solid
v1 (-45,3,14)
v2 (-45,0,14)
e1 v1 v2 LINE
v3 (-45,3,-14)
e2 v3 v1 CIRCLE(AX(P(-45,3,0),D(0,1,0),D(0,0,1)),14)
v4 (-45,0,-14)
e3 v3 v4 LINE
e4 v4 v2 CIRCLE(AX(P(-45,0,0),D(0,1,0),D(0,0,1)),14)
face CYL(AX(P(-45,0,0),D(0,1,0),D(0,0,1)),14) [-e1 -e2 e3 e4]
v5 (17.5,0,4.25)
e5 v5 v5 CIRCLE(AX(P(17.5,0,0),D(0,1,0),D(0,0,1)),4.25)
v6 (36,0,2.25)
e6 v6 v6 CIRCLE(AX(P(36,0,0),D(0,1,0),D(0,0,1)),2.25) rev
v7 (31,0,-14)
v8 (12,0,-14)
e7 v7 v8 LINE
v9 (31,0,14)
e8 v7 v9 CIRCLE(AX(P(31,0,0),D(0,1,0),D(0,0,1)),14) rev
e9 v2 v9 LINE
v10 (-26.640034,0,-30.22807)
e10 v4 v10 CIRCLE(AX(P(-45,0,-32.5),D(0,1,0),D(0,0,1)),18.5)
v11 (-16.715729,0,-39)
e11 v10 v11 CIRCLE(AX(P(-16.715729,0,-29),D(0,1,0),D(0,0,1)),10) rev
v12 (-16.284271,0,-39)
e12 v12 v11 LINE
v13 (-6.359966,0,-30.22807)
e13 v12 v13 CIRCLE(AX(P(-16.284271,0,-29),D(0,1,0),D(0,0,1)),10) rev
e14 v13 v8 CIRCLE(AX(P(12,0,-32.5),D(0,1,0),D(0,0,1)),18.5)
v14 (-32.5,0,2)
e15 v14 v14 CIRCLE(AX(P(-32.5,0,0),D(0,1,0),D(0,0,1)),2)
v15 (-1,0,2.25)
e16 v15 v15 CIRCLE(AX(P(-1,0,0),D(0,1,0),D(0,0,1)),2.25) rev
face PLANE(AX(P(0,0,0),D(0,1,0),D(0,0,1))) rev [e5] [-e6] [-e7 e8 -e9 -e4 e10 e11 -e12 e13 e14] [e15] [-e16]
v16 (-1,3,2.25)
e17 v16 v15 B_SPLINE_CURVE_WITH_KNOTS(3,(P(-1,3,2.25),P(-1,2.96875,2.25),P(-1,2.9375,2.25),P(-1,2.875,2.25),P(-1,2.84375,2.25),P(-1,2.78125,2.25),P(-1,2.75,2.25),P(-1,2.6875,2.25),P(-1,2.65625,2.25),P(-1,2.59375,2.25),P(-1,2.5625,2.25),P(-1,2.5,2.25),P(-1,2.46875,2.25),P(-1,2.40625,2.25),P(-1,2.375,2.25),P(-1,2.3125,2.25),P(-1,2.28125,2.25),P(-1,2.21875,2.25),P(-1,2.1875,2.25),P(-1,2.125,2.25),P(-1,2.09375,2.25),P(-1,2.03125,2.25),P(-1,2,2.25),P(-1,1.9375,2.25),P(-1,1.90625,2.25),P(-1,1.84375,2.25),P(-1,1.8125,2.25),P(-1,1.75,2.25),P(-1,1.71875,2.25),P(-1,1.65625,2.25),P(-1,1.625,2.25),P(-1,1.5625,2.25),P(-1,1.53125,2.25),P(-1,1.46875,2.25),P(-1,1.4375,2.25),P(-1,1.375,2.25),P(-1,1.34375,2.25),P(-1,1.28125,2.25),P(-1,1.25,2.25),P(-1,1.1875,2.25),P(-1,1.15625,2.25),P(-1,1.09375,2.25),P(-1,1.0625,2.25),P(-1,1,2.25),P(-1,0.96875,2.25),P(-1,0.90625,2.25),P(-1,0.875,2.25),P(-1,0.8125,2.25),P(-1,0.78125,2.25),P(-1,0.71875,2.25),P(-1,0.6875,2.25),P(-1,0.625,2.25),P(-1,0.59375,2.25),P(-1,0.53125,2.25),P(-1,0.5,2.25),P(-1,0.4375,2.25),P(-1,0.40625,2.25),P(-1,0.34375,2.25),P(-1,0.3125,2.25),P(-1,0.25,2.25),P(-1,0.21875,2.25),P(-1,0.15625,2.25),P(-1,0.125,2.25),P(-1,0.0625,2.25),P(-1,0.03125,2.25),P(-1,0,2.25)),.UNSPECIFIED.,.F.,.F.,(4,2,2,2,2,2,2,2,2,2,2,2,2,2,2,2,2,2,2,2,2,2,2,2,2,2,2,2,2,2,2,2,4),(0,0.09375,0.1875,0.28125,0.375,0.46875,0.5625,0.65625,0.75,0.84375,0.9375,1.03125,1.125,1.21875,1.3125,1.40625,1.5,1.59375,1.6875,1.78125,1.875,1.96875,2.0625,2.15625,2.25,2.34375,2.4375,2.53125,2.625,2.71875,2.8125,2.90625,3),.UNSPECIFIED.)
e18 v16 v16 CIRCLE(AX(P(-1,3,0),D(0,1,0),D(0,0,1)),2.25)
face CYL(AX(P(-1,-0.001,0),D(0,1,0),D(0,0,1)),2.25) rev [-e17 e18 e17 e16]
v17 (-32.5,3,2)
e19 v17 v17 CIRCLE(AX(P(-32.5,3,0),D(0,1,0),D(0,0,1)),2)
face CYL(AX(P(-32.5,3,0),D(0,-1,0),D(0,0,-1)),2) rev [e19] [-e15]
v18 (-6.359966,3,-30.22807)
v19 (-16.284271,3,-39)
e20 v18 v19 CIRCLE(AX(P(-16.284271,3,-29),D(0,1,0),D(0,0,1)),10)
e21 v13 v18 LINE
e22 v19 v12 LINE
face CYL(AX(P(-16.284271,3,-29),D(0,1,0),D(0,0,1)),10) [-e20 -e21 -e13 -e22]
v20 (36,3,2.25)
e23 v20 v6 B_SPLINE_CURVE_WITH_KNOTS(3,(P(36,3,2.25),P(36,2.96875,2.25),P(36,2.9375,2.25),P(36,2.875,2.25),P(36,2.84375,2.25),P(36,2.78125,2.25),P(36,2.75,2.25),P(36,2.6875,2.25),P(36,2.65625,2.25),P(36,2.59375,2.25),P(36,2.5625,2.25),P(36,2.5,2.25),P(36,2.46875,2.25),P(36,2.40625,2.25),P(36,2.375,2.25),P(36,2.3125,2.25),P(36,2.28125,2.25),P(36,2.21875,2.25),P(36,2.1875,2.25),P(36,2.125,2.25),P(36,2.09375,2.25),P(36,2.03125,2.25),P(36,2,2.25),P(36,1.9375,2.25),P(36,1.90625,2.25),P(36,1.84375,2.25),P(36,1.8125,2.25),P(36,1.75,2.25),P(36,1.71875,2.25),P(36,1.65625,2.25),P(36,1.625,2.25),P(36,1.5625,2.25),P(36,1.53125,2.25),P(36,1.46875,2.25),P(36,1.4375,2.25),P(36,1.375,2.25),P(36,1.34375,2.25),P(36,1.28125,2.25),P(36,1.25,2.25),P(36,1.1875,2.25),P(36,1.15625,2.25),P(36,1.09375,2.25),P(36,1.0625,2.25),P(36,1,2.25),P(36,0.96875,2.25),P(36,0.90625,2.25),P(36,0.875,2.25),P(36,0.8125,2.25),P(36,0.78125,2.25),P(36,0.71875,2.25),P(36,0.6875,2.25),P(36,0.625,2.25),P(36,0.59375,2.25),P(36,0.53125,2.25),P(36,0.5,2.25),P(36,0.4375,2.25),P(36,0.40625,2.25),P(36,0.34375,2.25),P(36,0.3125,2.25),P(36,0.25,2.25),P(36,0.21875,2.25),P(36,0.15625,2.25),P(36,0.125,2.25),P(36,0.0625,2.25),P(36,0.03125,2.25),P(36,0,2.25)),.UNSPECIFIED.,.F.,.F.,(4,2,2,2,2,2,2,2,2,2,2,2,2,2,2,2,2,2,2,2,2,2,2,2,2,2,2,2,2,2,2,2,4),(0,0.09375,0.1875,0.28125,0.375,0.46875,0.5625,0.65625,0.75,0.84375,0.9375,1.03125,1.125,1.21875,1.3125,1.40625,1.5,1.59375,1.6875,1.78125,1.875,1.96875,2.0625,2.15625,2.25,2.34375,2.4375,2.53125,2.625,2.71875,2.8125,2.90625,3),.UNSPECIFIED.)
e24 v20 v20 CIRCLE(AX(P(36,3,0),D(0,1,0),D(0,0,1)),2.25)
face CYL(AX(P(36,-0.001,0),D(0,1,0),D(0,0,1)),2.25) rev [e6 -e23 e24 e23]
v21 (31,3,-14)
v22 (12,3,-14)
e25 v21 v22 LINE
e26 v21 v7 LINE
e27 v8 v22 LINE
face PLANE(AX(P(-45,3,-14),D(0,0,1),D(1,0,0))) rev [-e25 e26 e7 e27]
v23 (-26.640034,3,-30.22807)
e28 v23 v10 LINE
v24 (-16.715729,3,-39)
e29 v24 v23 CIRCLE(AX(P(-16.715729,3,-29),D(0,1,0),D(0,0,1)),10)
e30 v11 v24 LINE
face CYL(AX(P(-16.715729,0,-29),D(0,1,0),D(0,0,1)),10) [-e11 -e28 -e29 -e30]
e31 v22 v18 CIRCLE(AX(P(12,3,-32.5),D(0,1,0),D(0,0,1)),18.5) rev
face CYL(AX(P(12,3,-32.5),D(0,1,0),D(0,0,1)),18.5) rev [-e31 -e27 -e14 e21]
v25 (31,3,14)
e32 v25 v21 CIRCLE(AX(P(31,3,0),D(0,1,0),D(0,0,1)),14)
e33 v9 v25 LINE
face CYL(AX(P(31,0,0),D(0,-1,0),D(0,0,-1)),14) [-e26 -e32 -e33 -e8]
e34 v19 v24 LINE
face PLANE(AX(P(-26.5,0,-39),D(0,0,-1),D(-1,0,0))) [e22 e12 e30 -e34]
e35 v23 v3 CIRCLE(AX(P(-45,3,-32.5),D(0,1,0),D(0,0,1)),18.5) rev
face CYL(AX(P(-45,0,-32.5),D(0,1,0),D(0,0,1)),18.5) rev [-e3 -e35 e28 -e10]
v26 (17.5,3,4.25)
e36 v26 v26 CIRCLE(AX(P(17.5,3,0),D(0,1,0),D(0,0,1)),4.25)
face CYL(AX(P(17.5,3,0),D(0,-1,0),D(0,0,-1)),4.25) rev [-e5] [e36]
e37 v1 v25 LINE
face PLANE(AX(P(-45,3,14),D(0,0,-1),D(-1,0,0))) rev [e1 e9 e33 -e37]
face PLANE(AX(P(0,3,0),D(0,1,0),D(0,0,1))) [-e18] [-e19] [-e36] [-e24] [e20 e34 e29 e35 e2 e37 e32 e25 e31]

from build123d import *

# Parameters (mm, degrees)
SKETCH_1_W          = 90
SKETCH_1_H          = 28
SKETCH_1_R          = 4.25
SKETCH_1_R_2        = 2
EXTRUDE_1_DEPTH     = 3
CUT_EXTRUDE_1_REACH = 49.223
SKETCH_3_R          = 2.25
SKETCH_4_W          = 20
SKETCH_4_H          = 25
EXTRUDE_3_DEPTH     = 3
FILLET_6_R          = 18.5
FILLET_9_R          = 10
EXTRUDE_4_DEPTH     = 3
FILLET_11_RADIUS    = 14
FILLET_11_LENGTH    = 3


with BuildPart() as part:
    # 草图1 → 凸台-拉伸1 (new body)
    with BuildSketch(Plane(origin=(0, 0, 0), x_dir=(1, 0, 0), z_dir=(0, 1, 0))):
        Rectangle(SKETCH_1_W, SKETCH_1_H)
        with Locations(Location((17.5, 0, 0), (0, 0, 270))):
            Circle(SKETCH_1_R, mode=Mode.SUBTRACT)
        with Locations(Location((-32.5, 0, 0), (0, 0, 270))):
            Circle(SKETCH_1_R_2, mode=Mode.SUBTRACT)
    extrude(amount=EXTRUDE_1_DEPTH)

    # 草图3 → 切除-拉伸1 (cut, up to next)
    with BuildSketch(Plane(origin=(0, 3, 0), x_dir=(1, 0, 0), z_dir=(0, 1, 0)), mode=Mode.PRIVATE) as cut_extrude_1_sk1:
        with Locations(Location((36, 0, 0), (0, 0, 270))):
            Circle(SKETCH_3_R)
    cut_extrude_1_tool1 = extrude(cut_extrude_1_sk1.sketch, amount=-CUT_EXTRUDE_1_REACH, mode=Mode.PRIVATE) & part.part
    # 草图3 → 切除-拉伸1 (cut, up to next)
    with BuildSketch(Plane(origin=(0, 3, 0), x_dir=(1, 0, 0), z_dir=(0, 1, 0)), mode=Mode.PRIVATE) as cut_extrude_1_sk2:
        with Locations(Location((-1, 0, 0), (0, 0, 270))):
            Circle(SKETCH_3_R)
    cut_extrude_1_tool2 = extrude(cut_extrude_1_sk2.sketch, amount=-CUT_EXTRUDE_1_REACH, mode=Mode.PRIVATE) & part.part
    add(cut_extrude_1_tool1.solids().sort_by_distance((36, 3, 0))[0], mode=Mode.SUBTRACT)
    add(cut_extrude_1_tool2.solids().sort_by_distance((-1, 3, 0))[0], mode=Mode.SUBTRACT)

    # 草图4 → 凸台-拉伸3 (add)
    with BuildSketch(Plane(origin=(0, 3, 0), x_dir=(1, 0, 0), z_dir=(0, 1, 0))):
        with Locations((-16.5, 26.5)):
            Rectangle(SKETCH_4_W, SKETCH_4_H)
    extrude(amount=-EXTRUDE_3_DEPTH)

    # 圆角6
    fillet_6_edges = [part.edges().sort_by_distance(p)[0] for p in [
        (-26.5, 1.5, -14),
        (-6.5, 1.5, -14),
    ]]
    fillet(fillet_6_edges, radius=FILLET_6_R - 0.0001)  # a hair under: the kernel refuses the full size

    # 圆角9
    fillet_9_edges = [part.edges().sort_by_distance(p)[0] for p in [
        (-6.5, 1.5, -39),
        (-26.5, 1.5, -39),
    ]]
    fillet(fillet_9_edges, radius=FILLET_9_R)

    # 草图6 → 凸台-拉伸4 (add)
    with BuildSketch(Plane(origin=(0, 3, 0), x_dir=(1, 0, 0), z_dir=(0, 1, 0))):
        with BuildLine():
            Line((-45, -14), (-45, 14))
            ThreePointArc((-45, 14), (-59, 0), (-45, -14))
        make_face()
    extrude(amount=-EXTRUDE_4_DEPTH)

    # 圆角11: full round fillet: the end face becomes a half cylinder, R = half its width
    fillet_11_face = Plane((45, 1.5, 0), x_dir=(0, -1, 0), z_dir=(1, 0, 0))  # on the end face: x along it, z out of the body
    fillet_11_slab = fillet_11_face.offset(-FILLET_11_RADIUS / 2) * Box(FILLET_11_LENGTH, 2 * FILLET_11_RADIUS, FILLET_11_RADIUS, mode=Mode.PRIVATE)  # the body's end, R deep
    fillet_11_round = Plane((31, 1.5, 0), x_dir=(1, 0, 0), z_dir=(0, -1, 0)) * Cylinder(FILLET_11_RADIUS, FILLET_11_LENGTH, mode=Mode.PRIVATE)  # its axis R under the face
    add(fillet_11_slab - fillet_11_round, mode=Mode.SUBTRACT)


solid = part.part
